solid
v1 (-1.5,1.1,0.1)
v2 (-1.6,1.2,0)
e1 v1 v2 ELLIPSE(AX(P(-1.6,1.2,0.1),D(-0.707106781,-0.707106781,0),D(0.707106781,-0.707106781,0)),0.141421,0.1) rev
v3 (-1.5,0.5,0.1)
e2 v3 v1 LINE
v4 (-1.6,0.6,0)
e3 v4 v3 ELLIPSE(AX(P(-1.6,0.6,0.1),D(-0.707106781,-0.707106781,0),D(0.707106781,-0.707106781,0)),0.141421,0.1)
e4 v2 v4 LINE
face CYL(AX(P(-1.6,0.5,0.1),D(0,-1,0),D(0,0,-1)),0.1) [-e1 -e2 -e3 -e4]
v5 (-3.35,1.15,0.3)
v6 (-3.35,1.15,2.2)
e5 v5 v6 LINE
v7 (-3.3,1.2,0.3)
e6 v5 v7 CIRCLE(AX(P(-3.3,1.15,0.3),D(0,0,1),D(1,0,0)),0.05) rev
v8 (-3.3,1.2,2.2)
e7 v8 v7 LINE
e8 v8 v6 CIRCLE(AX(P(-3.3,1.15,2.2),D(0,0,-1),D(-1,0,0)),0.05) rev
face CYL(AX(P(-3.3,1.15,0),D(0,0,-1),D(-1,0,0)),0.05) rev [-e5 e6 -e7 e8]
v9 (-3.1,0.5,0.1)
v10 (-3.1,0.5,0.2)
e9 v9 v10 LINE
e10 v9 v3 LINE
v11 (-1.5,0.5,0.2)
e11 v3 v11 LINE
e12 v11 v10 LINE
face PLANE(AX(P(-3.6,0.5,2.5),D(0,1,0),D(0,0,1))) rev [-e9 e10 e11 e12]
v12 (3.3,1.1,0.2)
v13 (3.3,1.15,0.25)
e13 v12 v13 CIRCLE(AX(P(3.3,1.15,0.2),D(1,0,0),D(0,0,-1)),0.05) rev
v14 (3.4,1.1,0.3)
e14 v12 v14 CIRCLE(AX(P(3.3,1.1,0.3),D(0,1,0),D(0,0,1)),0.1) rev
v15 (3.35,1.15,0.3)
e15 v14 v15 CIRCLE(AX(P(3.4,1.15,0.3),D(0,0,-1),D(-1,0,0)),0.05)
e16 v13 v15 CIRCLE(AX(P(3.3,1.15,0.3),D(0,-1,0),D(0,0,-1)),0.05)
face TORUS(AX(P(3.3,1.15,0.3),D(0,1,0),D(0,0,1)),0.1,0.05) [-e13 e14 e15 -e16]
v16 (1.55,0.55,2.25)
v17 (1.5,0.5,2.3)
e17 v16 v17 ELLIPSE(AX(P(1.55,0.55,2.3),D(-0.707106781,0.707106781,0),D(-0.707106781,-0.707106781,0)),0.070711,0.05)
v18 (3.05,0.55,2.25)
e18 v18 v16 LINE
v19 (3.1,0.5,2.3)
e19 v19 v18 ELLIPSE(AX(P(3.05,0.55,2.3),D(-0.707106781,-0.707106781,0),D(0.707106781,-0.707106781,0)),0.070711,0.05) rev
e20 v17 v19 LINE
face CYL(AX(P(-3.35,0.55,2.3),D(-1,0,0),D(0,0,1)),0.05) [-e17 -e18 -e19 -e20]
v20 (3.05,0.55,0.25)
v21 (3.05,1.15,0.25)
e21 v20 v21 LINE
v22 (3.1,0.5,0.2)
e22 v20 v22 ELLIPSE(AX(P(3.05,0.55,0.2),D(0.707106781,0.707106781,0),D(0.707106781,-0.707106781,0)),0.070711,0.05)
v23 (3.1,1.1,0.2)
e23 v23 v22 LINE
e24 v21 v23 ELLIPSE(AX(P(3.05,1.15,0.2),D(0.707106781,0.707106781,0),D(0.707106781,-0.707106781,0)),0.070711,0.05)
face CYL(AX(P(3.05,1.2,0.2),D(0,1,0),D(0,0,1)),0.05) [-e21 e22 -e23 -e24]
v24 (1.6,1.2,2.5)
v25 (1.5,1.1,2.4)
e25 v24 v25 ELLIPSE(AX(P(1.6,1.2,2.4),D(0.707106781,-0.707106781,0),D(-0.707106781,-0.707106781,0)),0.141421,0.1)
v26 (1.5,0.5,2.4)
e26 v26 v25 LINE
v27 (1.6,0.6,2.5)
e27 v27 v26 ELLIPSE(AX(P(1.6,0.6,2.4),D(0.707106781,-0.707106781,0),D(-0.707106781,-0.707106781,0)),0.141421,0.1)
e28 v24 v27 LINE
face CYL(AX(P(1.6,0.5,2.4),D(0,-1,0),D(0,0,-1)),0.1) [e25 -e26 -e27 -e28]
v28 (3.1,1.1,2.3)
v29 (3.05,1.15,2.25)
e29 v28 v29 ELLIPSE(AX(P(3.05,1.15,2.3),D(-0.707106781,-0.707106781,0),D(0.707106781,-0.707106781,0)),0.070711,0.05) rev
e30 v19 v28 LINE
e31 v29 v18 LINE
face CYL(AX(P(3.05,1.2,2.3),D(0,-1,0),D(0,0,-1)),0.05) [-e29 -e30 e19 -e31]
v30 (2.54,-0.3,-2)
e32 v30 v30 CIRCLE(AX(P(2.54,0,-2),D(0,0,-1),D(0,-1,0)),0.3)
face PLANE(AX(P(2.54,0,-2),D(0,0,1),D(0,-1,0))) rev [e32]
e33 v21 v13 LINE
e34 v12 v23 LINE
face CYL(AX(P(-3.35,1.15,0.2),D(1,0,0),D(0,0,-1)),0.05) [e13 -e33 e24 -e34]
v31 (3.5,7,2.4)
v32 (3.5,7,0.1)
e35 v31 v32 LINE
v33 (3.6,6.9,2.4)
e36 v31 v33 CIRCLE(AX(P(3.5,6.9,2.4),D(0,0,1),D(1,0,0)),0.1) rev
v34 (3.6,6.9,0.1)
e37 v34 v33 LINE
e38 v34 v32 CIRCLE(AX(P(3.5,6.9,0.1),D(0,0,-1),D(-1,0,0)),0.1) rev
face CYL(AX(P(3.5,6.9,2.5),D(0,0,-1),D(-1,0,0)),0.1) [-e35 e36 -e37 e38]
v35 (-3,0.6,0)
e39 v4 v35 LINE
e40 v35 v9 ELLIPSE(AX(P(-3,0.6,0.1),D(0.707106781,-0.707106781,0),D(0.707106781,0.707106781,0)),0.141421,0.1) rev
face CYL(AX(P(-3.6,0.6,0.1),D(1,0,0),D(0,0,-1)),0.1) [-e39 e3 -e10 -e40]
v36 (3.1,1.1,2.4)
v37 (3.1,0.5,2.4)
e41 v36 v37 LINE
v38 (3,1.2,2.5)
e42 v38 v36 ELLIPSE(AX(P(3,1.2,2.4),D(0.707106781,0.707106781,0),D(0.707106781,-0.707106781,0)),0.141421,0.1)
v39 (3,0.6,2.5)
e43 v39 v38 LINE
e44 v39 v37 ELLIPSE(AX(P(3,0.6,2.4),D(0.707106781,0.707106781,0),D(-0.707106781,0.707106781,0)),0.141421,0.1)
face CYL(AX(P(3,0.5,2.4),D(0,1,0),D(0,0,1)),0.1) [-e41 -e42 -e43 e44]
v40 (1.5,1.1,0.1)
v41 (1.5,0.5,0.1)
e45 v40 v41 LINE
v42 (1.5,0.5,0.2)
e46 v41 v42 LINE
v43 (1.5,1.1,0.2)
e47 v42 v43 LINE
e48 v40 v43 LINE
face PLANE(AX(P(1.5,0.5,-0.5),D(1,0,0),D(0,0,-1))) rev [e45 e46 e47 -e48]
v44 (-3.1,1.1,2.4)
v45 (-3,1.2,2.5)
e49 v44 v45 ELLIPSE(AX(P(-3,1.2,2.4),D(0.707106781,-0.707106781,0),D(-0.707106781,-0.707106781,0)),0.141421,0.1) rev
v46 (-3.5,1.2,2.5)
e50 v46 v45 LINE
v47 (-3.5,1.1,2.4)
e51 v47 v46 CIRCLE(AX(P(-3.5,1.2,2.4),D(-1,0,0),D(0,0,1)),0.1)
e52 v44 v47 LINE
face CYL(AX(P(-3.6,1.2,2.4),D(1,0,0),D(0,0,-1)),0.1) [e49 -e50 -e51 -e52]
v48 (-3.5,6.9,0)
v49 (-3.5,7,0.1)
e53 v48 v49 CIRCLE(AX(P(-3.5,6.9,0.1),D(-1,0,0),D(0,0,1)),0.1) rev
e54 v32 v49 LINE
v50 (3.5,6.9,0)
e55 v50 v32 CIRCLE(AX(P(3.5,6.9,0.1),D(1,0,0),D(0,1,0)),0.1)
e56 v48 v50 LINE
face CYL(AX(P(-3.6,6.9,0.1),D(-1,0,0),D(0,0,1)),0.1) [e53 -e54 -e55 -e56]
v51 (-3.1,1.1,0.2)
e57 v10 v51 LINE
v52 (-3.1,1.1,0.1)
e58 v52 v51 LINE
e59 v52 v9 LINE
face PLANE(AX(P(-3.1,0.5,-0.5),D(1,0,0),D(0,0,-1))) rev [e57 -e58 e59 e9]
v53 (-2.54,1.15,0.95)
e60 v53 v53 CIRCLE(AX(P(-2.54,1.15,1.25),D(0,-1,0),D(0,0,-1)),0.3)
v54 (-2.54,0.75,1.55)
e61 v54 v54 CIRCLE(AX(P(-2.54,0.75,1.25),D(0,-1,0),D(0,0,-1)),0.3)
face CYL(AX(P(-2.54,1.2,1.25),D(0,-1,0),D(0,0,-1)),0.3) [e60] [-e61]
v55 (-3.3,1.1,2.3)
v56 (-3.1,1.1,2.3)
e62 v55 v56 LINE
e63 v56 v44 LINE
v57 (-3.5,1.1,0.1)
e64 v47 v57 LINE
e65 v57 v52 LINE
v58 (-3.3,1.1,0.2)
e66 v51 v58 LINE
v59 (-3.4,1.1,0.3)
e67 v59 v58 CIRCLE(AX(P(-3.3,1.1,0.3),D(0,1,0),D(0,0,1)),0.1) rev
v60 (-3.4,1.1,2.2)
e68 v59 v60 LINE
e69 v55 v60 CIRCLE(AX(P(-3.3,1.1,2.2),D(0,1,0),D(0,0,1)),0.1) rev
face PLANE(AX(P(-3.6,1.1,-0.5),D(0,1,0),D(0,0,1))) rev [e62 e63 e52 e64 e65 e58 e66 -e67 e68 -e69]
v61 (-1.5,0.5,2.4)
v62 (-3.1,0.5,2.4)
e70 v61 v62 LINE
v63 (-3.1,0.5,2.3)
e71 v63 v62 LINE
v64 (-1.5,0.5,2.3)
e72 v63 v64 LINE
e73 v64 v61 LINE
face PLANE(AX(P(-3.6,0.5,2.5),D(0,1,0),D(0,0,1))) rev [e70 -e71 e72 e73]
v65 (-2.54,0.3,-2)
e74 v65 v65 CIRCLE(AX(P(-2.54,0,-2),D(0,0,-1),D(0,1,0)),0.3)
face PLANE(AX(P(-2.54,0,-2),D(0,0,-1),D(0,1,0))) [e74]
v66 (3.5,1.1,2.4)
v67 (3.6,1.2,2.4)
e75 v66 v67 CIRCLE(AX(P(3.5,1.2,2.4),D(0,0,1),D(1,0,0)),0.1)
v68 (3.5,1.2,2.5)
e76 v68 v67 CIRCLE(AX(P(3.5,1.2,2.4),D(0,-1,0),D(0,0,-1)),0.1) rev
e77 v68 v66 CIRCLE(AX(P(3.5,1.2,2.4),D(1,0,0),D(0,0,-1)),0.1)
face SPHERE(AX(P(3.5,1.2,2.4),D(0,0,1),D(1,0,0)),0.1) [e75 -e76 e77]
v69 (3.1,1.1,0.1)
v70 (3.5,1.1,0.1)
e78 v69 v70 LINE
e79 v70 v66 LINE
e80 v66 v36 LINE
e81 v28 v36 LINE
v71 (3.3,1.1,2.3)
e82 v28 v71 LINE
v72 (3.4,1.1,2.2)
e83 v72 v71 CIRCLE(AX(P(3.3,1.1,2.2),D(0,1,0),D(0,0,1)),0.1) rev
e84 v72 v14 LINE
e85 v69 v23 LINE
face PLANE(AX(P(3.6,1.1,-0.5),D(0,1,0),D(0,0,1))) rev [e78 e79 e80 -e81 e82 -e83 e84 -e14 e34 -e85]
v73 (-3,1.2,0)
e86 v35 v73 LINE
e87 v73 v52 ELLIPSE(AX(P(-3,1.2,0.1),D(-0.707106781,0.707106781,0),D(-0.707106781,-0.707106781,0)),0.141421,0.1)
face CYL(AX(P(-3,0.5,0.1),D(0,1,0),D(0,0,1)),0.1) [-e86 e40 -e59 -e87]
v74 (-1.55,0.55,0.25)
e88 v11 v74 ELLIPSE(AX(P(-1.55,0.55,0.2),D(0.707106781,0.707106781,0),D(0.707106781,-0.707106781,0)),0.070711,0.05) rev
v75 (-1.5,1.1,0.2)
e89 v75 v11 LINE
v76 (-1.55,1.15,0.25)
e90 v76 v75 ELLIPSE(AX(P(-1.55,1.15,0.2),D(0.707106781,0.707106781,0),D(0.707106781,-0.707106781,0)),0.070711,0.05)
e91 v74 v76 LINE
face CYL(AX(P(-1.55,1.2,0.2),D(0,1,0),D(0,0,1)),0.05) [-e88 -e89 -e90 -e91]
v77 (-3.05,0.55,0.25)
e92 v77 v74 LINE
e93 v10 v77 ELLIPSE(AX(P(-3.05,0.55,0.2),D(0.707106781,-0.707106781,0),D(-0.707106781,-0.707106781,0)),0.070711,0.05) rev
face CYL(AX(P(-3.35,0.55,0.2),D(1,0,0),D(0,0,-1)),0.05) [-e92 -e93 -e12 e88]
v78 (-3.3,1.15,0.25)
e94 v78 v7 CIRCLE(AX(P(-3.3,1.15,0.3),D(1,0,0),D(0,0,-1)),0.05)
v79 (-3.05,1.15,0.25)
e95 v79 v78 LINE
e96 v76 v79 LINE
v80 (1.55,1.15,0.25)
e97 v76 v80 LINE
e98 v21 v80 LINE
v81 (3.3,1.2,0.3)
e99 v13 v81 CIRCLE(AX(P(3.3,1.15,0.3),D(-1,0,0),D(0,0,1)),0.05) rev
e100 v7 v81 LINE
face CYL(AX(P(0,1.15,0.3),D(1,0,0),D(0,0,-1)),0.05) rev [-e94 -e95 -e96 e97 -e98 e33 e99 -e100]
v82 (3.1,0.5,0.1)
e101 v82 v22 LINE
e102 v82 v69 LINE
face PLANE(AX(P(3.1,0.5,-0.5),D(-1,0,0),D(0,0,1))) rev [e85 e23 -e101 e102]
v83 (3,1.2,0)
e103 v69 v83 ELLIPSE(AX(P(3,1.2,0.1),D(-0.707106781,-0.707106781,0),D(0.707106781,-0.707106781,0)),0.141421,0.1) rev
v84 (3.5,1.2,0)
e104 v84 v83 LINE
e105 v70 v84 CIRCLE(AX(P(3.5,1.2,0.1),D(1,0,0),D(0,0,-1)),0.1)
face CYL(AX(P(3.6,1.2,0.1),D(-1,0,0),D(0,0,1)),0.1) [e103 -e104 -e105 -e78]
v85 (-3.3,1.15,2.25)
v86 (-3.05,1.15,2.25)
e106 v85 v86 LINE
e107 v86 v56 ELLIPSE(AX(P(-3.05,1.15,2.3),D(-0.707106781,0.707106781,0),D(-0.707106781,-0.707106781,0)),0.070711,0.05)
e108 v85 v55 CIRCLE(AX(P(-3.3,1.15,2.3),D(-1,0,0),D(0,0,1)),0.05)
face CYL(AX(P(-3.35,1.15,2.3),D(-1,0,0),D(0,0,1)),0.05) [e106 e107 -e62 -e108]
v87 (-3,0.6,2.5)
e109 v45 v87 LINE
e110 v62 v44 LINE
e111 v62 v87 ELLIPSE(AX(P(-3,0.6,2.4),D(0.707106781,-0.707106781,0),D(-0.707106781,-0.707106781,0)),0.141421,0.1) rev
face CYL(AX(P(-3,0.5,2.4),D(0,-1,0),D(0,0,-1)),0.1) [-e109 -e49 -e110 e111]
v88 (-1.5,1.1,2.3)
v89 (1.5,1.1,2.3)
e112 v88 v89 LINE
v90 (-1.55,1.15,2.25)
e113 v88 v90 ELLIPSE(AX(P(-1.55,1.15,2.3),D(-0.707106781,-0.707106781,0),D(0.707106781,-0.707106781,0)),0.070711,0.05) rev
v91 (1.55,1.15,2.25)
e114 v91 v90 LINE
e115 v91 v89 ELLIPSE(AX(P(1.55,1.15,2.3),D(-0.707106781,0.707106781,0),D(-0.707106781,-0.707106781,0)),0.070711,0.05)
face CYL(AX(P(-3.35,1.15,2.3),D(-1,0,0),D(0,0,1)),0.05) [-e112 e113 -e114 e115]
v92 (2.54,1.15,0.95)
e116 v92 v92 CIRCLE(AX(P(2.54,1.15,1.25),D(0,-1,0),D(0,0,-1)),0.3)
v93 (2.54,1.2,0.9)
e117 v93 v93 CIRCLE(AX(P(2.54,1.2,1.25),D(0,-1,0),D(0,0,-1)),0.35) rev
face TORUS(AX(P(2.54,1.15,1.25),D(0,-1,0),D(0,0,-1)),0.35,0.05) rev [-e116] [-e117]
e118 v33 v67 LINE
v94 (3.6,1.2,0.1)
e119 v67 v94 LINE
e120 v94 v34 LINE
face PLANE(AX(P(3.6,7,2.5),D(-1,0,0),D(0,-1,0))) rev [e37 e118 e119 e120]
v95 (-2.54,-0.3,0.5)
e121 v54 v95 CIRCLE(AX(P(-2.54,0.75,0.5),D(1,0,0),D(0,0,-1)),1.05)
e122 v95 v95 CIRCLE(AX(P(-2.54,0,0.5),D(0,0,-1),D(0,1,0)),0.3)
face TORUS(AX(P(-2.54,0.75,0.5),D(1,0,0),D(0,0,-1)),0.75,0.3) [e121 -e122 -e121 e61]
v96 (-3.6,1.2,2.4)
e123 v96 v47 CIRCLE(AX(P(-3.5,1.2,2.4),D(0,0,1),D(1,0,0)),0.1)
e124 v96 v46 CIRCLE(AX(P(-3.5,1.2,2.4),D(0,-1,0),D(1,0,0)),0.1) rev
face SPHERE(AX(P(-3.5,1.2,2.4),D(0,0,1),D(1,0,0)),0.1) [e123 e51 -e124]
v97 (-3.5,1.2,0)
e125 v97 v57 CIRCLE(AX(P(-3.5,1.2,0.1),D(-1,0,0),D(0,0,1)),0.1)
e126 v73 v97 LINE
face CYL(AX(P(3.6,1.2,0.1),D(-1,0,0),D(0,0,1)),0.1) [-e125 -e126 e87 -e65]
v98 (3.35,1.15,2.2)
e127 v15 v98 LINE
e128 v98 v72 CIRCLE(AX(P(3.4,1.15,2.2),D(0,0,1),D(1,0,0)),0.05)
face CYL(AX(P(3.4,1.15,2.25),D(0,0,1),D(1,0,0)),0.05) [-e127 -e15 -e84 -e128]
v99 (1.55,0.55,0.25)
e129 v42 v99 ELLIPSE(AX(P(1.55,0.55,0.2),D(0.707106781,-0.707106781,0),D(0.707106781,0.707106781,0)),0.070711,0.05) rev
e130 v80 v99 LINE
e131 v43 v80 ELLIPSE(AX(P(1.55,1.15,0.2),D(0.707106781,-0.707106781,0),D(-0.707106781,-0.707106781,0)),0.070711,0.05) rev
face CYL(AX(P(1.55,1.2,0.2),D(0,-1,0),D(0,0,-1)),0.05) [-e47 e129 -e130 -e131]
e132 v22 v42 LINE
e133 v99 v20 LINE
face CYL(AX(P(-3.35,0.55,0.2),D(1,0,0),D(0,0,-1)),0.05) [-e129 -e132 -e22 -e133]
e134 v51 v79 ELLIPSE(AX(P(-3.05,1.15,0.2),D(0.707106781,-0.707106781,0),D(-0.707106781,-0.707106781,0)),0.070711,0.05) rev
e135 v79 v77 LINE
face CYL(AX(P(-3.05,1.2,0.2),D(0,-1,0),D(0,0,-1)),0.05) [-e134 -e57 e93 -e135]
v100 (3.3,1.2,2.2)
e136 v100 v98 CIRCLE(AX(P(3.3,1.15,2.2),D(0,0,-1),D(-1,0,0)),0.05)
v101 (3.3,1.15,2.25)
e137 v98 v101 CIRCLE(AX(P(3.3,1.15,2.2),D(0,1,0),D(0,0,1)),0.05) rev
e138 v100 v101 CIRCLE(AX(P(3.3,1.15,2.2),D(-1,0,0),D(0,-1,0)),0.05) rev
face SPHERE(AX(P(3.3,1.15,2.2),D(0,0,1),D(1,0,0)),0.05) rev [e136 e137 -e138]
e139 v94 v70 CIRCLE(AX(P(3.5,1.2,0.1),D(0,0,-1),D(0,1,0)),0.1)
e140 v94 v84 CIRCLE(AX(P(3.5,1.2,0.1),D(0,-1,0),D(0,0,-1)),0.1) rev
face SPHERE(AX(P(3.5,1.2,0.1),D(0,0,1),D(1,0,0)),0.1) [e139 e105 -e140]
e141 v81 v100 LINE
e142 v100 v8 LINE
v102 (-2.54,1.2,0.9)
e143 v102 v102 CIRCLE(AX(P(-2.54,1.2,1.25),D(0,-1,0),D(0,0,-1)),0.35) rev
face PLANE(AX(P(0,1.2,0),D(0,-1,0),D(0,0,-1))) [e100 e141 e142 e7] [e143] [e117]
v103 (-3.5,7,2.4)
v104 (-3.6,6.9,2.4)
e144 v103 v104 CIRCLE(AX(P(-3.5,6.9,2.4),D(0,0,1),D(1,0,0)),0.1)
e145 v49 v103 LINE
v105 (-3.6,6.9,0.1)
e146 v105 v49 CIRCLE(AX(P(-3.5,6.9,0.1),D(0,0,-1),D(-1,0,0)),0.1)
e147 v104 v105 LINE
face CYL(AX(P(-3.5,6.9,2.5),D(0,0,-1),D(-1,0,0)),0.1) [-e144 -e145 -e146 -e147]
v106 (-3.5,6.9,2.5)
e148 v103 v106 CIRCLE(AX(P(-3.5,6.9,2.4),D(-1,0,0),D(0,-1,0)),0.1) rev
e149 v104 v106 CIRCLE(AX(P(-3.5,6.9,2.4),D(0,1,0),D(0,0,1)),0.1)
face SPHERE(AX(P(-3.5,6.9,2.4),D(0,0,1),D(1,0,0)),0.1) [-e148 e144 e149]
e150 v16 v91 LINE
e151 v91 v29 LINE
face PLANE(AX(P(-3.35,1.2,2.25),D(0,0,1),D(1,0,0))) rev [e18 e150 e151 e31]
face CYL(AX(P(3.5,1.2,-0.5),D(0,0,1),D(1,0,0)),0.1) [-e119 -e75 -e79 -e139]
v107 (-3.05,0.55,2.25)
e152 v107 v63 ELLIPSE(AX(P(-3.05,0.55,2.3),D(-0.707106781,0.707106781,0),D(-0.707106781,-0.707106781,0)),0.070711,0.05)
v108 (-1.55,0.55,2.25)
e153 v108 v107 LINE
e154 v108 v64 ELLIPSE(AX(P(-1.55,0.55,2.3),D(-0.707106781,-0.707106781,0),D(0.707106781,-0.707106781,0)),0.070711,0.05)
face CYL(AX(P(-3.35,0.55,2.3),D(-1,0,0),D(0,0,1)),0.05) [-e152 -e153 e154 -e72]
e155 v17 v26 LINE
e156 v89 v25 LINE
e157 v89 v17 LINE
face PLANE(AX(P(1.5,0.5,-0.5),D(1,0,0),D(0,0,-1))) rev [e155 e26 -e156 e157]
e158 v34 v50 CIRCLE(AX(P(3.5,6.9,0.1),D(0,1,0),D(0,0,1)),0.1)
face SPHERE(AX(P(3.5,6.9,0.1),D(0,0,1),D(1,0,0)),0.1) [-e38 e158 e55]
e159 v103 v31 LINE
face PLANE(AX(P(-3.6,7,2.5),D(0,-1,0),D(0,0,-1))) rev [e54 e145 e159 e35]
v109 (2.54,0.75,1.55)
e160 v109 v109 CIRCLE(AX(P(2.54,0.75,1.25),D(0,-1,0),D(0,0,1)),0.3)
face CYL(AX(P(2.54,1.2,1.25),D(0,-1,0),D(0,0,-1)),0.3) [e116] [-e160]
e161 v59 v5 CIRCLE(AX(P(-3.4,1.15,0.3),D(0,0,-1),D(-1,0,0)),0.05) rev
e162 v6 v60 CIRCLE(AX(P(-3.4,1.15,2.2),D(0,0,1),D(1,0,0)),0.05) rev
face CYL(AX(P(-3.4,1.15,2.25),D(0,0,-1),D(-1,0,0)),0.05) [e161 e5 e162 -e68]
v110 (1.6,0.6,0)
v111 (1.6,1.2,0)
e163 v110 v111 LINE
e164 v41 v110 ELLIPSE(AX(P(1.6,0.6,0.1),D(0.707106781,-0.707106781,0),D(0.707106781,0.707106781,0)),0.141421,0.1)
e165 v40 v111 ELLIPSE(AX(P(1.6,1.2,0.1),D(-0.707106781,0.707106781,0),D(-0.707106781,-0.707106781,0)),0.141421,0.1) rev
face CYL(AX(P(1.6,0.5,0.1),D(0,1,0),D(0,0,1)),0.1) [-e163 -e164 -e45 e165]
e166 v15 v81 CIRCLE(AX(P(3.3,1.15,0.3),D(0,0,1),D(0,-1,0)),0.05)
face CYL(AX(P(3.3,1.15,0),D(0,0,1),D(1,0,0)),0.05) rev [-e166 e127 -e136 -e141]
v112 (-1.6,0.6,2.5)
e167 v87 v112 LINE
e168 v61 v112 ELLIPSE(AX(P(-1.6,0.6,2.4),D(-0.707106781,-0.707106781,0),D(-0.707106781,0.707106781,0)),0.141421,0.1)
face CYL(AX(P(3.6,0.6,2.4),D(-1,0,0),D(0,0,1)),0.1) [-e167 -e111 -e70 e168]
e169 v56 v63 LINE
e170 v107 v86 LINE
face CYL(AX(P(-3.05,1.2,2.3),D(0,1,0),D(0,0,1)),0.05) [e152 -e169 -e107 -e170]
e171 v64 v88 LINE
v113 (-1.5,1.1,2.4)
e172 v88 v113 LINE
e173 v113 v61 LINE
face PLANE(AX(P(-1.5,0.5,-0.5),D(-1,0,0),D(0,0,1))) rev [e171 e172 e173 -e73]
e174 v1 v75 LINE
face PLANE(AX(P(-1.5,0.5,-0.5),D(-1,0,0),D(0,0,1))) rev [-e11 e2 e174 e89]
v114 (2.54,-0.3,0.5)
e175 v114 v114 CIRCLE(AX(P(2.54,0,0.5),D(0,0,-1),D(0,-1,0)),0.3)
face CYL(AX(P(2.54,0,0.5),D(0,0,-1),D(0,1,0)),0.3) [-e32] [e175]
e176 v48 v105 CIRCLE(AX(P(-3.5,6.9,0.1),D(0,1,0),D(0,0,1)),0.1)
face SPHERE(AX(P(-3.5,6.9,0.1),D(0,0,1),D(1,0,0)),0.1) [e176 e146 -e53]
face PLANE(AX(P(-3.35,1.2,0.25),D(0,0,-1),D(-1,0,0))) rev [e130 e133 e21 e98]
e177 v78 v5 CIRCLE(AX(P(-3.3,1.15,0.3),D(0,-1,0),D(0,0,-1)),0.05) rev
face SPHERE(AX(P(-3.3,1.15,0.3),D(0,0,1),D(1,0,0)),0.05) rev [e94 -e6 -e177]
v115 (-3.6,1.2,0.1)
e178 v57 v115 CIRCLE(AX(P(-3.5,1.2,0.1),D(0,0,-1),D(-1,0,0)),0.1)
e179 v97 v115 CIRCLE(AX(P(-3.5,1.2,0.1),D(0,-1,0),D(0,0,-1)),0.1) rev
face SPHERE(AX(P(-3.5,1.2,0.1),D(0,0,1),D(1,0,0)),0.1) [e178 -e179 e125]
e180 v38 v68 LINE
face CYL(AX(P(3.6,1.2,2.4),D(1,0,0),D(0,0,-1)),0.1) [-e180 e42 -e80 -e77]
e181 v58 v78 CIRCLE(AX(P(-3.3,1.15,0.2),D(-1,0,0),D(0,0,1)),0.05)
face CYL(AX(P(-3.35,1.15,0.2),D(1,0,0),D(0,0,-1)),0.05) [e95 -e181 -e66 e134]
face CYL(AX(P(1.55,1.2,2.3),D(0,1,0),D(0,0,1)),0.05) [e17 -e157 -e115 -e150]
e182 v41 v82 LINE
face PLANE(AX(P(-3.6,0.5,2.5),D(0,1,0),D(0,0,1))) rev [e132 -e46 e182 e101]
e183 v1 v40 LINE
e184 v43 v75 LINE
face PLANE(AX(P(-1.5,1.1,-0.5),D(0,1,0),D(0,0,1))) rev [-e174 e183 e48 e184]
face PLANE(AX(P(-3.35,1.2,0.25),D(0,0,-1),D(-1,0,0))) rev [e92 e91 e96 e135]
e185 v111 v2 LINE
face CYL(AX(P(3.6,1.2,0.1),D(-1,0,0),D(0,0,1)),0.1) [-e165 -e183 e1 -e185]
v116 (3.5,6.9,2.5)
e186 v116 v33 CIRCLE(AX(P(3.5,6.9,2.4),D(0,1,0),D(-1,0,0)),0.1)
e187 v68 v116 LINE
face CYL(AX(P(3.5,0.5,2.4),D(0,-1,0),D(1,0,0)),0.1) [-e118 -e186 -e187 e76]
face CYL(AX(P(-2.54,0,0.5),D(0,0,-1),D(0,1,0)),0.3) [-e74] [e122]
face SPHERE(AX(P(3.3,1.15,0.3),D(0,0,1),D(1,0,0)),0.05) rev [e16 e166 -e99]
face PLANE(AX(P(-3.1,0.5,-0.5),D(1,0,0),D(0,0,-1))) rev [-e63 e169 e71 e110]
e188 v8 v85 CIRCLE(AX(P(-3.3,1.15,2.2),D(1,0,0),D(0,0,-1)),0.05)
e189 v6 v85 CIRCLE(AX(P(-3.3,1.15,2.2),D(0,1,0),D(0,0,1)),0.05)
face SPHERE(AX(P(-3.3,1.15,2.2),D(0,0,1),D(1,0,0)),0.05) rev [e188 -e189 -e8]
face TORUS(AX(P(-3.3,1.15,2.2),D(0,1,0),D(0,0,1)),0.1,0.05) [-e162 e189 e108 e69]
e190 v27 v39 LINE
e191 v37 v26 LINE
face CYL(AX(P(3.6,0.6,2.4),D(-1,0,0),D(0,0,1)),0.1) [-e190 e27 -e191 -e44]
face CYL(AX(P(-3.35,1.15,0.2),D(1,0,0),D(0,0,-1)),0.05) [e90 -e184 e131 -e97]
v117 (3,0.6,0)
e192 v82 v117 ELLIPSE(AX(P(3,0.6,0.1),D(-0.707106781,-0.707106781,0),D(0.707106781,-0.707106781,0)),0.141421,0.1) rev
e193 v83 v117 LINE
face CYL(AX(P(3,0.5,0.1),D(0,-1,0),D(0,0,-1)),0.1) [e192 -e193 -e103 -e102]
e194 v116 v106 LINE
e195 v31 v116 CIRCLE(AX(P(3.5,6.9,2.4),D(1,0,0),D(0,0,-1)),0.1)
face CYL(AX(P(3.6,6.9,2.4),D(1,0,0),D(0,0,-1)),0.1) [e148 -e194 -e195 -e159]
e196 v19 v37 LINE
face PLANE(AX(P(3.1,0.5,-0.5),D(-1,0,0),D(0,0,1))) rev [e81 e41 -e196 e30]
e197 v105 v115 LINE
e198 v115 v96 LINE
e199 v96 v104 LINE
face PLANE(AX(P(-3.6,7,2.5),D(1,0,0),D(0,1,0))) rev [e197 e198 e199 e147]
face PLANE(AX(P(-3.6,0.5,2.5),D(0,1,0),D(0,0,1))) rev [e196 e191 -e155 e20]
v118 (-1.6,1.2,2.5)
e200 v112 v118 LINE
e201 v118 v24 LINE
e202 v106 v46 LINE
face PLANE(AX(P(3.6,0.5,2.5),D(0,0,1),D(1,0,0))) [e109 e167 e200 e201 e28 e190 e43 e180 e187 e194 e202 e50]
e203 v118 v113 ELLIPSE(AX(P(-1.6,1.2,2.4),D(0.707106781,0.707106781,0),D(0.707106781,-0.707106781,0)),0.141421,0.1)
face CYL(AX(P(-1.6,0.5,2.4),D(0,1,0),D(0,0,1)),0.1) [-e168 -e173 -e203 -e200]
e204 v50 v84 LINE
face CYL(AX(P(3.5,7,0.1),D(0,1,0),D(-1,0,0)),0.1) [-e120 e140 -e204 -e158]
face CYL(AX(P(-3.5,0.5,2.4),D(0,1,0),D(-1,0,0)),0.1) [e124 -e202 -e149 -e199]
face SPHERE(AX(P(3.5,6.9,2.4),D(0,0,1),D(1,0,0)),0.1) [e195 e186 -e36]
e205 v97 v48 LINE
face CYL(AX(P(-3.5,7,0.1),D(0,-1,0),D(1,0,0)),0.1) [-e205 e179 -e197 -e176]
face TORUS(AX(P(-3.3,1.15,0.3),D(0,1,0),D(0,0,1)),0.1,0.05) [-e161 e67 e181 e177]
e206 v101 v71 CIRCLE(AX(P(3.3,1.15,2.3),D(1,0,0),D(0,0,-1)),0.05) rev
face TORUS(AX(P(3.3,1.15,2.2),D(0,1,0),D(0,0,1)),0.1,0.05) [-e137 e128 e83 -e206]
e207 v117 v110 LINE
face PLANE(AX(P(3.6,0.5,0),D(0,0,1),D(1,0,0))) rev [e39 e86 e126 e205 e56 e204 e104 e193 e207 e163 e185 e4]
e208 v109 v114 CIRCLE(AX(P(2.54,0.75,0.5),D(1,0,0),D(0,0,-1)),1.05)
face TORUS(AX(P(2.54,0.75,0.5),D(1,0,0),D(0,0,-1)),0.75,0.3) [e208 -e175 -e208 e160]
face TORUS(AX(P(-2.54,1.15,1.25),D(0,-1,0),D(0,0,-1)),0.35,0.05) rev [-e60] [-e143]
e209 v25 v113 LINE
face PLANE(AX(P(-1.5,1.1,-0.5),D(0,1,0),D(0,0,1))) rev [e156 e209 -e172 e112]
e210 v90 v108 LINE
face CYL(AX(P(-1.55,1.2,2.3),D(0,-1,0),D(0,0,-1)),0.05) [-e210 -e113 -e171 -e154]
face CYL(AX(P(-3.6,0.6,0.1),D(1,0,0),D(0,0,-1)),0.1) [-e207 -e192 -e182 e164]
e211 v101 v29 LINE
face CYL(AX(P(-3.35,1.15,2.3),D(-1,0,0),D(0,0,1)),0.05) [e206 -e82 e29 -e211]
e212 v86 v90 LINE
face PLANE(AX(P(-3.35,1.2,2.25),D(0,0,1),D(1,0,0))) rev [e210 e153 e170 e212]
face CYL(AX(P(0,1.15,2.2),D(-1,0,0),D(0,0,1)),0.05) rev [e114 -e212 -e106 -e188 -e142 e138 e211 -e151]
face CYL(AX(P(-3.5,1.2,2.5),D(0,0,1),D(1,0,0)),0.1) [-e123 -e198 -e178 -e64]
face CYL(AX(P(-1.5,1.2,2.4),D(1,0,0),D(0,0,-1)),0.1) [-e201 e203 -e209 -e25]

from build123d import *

# Parameters (mm, degrees)
SKETCH1_W           = 7.2
SKETCH1_H           = 6.5
BOSS_EXTRUDE1_DEPTH = 2.5
SKETCH5_W           = 6.7
SKETCH5_H           = 2
CUT_EXTRUDE1_DEPTH  = 0.7
SKETCH6_W           = 3
SKETCH6_H           = 0.6
SKETCH6_W_2         = 0.5
CUT_EXTRUDE2_DEPTH  = 3
SKETCH4_R           = 0.3
FILLET1_R           = 0.1
FILLET2_R           = 0.05


with BuildPart() as part:
    # Sketch1 → Boss-Extrude1 (new body)
    with BuildSketch(Plane.XY):
        with Locations((0, 3.75)):
            Rectangle(SKETCH1_W, SKETCH1_H)
    extrude(amount=BOSS_EXTRUDE1_DEPTH)

    # Sketch5 → Cut-Extrude1 (cut)
    with BuildSketch(Plane(origin=(0, 0.5, 0), x_dir=(-1, 0, 0), z_dir=(0, -1, 0))):
        with Locations((0, -1.25)):
            Rectangle(SKETCH5_W, SKETCH5_H)
    extrude(amount=-CUT_EXTRUDE1_DEPTH, mode=Mode.SUBTRACT)

    # Sketch6 → Cut-Extrude2 (cut)
    with BuildSketch(Plane.XY.offset(2.5)):
        with Locations((0, 0.8)):
            Rectangle(SKETCH6_W, SKETCH6_H)
        with Locations((-3.35, 0.8)):
            Rectangle(SKETCH6_W_2, SKETCH6_H)
        with Locations((3.35, 0.8)):
            Rectangle(SKETCH6_W_2, SKETCH6_H)
    extrude(amount=-CUT_EXTRUDE2_DEPTH, mode=Mode.SUBTRACT)

    # Pin: sweep along a path in Sketch7
    with BuildLine(Plane(origin=(-2.54, 0, 0), x_dir=(0, 0, -1), z_dir=(1, 0, 0))) as pin_path:
        Line((-1.25, 1.2), (-1.25, 0.75))
        ThreePointArc((-1.25, 0.75), (-1.030330086, 0.219669914), (-0.5, 0))
        Line((-0.5, 0), (2, 0))
    # Sketch4 → Pin (sweep)
    with BuildSketch(Plane.XZ.offset(-1.2)):
        with Locations((-2.54, 1.25)):
            Circle(SKETCH4_R)
        with Locations((2.54, 1.25)):
            Circle(SKETCH4_R)
    sweep(path=pin_path.line)

    # Fillet1
    fillet1_edges = [part.edges().sort_by_distance(p)[0] for p in [
        (-3.6, 4.05, 2.5),
        (3.6, 4.05, 0),
        (-2.3, 0.5, 0),
        (2.3, 0.5, 0),
        (3.6, 4.05, 2.5),
        (-2.3, 0.5, 2.5),
        (2.3, 0.5, 2.5),
        (-3.6, 4.05, 0),
        (3.6, 1.1, 1.25),
        (3.1, 0.8, 0),
        (3.35, 1.1, 0),
        (0, 7, 0),
        (3.35, 1.1, 2.5),
        (3.1, 0.8, 2.5),
        (-3.35, 1.1, 0),
        (-3.6, 1.1, 1.25),
        (-3.1, 0.8, 0),
        (-3.1, 0.8, 2.5),
        (-3.35, 1.1, 2.5),
        (0, 7, 2.5),
        (-1.5, 0.8, 0),
        (0, 1.1, 0),
        (-3.6, 7, 1.25),
        (1.5, 0.8, 0),
        (3.6, 7, 1.25),
        (-1.5, 0.8, 2.5),
        (1.5, 0.8, 2.5),
        (0, 1.1, 2.5),
    ]]
    fillet(fillet1_edges, radius=FILLET1_R)

    # Fillet2
    fillet2_edges = [part.edges().sort_by_distance(p)[0] for p in [
        (-2.84, 1.2, 1.25),
        (2.24, 1.2, 1.25),
        (3.35, 1.2, 1.25),
        (3.35, 1.15, 2.25),
        (0, 1.2, 0.25),
        (3.35, 1.15, 0.25),
        (-3.35, 1.2, 1.25),
        (-3.35, 1.15, 0.25),
        (0, 1.2, 2.25),
        (-3.35, 1.15, 2.25),
        (2.3, 0.5, 2.25),
        (-2.3, 0.5, 2.25),
        (1.5, 0.8, 2.25),
        (0, 1.1, 2.25),
        (-1.5, 0.8, 2.25),
        (-3.1, 0.8, 2.25),
        (-3.225, 1.1, 2.25),
        (3.225, 1.1, 2.25),
        (3.1, 0.8, 2.25),
        (-2.3, 0.5, 0.25),
        (2.3, 0.5, 0.25),
        (3.1, 0.8, 0.25),
        (3.225, 1.1, 0.25),
        (3.35, 1.1, 1.25),
        (-3.35, 1.1, 1.25),
        (-3.225, 1.1, 0.25),
        (-3.1, 0.8, 0.25),
        (-1.5, 0.8, 0.25),
        (0, 1.1, 0.25),
        (1.5, 0.8, 0.25),
    ]]
    fillet(fillet2_edges, radius=FILLET2_R - 0.0001)  # a hair under: the kernel refuses the full size


solid = part.part
